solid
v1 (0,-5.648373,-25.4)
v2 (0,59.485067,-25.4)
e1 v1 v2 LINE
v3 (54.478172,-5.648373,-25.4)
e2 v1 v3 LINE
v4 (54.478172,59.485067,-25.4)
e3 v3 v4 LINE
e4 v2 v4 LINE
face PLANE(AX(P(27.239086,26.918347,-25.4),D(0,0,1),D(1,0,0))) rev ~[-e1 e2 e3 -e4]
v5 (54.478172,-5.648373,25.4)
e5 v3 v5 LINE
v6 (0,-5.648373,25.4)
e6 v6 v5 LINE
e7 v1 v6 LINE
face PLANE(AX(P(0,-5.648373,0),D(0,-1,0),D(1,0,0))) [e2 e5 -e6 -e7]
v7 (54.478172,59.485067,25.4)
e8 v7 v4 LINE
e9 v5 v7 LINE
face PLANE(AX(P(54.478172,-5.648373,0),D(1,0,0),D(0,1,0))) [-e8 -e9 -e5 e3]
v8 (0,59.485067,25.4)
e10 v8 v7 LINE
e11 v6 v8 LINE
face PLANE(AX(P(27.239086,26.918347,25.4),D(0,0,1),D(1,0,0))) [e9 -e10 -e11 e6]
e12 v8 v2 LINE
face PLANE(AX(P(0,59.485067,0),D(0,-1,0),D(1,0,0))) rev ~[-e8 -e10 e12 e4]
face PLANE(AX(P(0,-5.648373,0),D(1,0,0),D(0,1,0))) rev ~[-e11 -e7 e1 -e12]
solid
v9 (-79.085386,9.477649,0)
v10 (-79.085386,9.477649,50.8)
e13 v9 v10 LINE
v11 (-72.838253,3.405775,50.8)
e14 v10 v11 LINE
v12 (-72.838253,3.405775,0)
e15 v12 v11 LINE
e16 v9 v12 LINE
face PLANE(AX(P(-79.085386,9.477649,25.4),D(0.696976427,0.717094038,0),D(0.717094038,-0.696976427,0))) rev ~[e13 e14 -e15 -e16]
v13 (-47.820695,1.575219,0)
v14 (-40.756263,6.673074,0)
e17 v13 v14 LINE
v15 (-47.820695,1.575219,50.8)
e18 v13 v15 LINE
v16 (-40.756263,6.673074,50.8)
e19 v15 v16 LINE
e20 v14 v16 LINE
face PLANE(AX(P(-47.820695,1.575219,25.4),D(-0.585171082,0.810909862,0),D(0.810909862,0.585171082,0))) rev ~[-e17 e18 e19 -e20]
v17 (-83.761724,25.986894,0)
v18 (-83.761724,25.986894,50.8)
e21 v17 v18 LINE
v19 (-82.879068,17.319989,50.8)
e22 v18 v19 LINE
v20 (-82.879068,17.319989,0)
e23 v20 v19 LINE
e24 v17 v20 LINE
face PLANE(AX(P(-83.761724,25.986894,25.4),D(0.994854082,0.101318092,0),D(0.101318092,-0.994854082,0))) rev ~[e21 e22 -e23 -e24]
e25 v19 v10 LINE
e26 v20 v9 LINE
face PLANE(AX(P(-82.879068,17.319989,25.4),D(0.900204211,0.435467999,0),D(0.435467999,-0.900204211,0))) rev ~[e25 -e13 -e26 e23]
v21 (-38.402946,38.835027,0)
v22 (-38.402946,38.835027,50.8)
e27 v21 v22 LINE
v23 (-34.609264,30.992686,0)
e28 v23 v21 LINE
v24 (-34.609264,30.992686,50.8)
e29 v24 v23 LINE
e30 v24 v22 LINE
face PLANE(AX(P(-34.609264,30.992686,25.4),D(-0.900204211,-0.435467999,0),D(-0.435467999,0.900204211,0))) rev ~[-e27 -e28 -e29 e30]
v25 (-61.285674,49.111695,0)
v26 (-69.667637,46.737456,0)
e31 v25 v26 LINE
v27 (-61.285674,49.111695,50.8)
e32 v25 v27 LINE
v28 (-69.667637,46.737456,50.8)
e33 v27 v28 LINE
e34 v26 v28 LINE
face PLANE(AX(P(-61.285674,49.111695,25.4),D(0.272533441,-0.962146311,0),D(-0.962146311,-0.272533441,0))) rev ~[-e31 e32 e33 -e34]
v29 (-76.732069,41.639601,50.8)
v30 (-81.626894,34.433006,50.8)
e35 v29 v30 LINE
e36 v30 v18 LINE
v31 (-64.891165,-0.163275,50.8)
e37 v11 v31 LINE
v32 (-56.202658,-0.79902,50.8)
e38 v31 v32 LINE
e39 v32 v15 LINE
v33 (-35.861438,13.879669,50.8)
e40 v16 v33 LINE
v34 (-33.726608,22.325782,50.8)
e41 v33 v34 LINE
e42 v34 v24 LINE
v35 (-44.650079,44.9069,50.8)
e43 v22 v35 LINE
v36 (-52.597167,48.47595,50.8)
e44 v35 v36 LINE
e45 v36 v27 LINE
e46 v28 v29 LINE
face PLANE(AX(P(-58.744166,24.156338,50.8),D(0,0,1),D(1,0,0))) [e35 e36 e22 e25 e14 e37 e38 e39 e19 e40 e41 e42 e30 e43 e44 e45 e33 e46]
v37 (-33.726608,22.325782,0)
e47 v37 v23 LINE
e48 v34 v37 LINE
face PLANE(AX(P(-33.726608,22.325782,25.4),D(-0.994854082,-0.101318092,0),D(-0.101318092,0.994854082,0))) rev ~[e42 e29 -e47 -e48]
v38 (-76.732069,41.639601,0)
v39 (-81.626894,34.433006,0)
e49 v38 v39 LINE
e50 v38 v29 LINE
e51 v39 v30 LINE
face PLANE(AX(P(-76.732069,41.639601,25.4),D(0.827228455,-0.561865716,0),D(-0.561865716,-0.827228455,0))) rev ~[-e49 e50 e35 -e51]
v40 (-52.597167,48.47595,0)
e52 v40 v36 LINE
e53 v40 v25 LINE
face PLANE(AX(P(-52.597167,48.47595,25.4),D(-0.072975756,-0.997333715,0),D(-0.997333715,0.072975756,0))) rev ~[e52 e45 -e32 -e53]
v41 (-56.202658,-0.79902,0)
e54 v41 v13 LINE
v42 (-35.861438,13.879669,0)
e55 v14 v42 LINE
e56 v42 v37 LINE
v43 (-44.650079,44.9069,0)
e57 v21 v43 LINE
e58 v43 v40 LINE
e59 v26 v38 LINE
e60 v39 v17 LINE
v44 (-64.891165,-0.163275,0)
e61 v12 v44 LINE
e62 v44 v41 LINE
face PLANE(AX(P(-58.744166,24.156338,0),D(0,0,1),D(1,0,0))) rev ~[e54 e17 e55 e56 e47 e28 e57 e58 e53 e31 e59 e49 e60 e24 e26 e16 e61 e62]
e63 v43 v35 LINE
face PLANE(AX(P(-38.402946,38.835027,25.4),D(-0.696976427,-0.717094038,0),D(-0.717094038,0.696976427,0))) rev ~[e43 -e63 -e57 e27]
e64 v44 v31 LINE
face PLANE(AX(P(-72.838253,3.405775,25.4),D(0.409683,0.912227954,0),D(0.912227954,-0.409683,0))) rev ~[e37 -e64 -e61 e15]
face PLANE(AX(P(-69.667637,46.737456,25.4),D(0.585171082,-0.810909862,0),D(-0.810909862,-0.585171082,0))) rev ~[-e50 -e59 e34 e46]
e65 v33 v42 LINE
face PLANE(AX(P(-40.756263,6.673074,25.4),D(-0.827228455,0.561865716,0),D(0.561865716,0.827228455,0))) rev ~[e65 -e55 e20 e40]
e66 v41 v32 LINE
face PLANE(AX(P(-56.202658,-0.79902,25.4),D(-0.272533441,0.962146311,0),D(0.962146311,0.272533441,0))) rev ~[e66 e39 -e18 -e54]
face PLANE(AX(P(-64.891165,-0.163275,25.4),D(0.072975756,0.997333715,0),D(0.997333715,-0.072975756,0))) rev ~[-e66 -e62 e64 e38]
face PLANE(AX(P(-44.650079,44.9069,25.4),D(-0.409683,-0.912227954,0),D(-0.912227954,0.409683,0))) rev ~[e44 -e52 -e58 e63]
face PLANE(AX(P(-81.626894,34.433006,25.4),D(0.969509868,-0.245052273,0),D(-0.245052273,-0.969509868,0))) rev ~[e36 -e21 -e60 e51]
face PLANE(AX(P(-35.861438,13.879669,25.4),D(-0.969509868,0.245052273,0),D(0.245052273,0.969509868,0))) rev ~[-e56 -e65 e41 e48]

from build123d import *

# Parameters (mm, degrees)
F1_DEPTH = 25.4
F2_DEPTH = 25.4
F3_W     = 54.4781722128
F3_H     = 65.1334398426
F4_DEPTH = 25.4
F6_DEPTH = 25.4


# Not quite as in the source:
# - a feature of the source that left no trace in its solid (it failed there, or was rolled back) is left out


with BuildPart() as f1:
    # F0 (on Top) → F1 (new body)
    with BuildSketch(Plane.XY):
        Polygon((-34.6092643811, 30.9926864128), (-38.4029460476, 38.8350266595), (-44.6500790503, 44.9069003716), (-52.5971669514, 48.4759499683), (-61.2856736633, 49.1116953946), (-69.667637048, 46.7374563695), (-76.7320686166, 41.6396011594), (-81.6268936621, 34.4330063391), (-83.7617240441, 25.9868936018), (-82.8790677116, 17.319988795), (-79.0853860452, 9.4776485484), (-72.8382530424, 3.4057748362), (-64.8911651414, -0.1632747605), (-56.2026584294, -0.7990201868), (-47.8206950447, 1.5752188384), (-40.7562634761, 6.6730740484), (-35.8614384306, 13.8796688688), (-33.7266080487, 22.3257816061), align=None)
    extrude(amount=F1_DEPTH)

    # F2 (add): a face of the model
    f2_faces = [f1.faces().sort_by_distance(p)[0] for p in [
        (-58.7441660464, 24.1563376039, 25.4),
    ]]
    extrude(f2_faces, amount=F2_DEPTH)


with BuildPart() as f4:
    # F3 (on Top) → F4 (new body)
    with BuildSketch(Plane.XY):
        with Locations((27.2390861064, 26.9183467608)):
            Rectangle(F3_W, F3_H)
    extrude(amount=F4_DEPTH)

    # F6 (add): a face of the model
    f6_faces = [f4.faces().sort_by_distance(p)[0] for p in [
        (27.2390861064, 26.9183467608, 0),
    ]]
    extrude(f6_faces, amount=F6_DEPTH)


solid = Compound([f1.part, f4.part])
